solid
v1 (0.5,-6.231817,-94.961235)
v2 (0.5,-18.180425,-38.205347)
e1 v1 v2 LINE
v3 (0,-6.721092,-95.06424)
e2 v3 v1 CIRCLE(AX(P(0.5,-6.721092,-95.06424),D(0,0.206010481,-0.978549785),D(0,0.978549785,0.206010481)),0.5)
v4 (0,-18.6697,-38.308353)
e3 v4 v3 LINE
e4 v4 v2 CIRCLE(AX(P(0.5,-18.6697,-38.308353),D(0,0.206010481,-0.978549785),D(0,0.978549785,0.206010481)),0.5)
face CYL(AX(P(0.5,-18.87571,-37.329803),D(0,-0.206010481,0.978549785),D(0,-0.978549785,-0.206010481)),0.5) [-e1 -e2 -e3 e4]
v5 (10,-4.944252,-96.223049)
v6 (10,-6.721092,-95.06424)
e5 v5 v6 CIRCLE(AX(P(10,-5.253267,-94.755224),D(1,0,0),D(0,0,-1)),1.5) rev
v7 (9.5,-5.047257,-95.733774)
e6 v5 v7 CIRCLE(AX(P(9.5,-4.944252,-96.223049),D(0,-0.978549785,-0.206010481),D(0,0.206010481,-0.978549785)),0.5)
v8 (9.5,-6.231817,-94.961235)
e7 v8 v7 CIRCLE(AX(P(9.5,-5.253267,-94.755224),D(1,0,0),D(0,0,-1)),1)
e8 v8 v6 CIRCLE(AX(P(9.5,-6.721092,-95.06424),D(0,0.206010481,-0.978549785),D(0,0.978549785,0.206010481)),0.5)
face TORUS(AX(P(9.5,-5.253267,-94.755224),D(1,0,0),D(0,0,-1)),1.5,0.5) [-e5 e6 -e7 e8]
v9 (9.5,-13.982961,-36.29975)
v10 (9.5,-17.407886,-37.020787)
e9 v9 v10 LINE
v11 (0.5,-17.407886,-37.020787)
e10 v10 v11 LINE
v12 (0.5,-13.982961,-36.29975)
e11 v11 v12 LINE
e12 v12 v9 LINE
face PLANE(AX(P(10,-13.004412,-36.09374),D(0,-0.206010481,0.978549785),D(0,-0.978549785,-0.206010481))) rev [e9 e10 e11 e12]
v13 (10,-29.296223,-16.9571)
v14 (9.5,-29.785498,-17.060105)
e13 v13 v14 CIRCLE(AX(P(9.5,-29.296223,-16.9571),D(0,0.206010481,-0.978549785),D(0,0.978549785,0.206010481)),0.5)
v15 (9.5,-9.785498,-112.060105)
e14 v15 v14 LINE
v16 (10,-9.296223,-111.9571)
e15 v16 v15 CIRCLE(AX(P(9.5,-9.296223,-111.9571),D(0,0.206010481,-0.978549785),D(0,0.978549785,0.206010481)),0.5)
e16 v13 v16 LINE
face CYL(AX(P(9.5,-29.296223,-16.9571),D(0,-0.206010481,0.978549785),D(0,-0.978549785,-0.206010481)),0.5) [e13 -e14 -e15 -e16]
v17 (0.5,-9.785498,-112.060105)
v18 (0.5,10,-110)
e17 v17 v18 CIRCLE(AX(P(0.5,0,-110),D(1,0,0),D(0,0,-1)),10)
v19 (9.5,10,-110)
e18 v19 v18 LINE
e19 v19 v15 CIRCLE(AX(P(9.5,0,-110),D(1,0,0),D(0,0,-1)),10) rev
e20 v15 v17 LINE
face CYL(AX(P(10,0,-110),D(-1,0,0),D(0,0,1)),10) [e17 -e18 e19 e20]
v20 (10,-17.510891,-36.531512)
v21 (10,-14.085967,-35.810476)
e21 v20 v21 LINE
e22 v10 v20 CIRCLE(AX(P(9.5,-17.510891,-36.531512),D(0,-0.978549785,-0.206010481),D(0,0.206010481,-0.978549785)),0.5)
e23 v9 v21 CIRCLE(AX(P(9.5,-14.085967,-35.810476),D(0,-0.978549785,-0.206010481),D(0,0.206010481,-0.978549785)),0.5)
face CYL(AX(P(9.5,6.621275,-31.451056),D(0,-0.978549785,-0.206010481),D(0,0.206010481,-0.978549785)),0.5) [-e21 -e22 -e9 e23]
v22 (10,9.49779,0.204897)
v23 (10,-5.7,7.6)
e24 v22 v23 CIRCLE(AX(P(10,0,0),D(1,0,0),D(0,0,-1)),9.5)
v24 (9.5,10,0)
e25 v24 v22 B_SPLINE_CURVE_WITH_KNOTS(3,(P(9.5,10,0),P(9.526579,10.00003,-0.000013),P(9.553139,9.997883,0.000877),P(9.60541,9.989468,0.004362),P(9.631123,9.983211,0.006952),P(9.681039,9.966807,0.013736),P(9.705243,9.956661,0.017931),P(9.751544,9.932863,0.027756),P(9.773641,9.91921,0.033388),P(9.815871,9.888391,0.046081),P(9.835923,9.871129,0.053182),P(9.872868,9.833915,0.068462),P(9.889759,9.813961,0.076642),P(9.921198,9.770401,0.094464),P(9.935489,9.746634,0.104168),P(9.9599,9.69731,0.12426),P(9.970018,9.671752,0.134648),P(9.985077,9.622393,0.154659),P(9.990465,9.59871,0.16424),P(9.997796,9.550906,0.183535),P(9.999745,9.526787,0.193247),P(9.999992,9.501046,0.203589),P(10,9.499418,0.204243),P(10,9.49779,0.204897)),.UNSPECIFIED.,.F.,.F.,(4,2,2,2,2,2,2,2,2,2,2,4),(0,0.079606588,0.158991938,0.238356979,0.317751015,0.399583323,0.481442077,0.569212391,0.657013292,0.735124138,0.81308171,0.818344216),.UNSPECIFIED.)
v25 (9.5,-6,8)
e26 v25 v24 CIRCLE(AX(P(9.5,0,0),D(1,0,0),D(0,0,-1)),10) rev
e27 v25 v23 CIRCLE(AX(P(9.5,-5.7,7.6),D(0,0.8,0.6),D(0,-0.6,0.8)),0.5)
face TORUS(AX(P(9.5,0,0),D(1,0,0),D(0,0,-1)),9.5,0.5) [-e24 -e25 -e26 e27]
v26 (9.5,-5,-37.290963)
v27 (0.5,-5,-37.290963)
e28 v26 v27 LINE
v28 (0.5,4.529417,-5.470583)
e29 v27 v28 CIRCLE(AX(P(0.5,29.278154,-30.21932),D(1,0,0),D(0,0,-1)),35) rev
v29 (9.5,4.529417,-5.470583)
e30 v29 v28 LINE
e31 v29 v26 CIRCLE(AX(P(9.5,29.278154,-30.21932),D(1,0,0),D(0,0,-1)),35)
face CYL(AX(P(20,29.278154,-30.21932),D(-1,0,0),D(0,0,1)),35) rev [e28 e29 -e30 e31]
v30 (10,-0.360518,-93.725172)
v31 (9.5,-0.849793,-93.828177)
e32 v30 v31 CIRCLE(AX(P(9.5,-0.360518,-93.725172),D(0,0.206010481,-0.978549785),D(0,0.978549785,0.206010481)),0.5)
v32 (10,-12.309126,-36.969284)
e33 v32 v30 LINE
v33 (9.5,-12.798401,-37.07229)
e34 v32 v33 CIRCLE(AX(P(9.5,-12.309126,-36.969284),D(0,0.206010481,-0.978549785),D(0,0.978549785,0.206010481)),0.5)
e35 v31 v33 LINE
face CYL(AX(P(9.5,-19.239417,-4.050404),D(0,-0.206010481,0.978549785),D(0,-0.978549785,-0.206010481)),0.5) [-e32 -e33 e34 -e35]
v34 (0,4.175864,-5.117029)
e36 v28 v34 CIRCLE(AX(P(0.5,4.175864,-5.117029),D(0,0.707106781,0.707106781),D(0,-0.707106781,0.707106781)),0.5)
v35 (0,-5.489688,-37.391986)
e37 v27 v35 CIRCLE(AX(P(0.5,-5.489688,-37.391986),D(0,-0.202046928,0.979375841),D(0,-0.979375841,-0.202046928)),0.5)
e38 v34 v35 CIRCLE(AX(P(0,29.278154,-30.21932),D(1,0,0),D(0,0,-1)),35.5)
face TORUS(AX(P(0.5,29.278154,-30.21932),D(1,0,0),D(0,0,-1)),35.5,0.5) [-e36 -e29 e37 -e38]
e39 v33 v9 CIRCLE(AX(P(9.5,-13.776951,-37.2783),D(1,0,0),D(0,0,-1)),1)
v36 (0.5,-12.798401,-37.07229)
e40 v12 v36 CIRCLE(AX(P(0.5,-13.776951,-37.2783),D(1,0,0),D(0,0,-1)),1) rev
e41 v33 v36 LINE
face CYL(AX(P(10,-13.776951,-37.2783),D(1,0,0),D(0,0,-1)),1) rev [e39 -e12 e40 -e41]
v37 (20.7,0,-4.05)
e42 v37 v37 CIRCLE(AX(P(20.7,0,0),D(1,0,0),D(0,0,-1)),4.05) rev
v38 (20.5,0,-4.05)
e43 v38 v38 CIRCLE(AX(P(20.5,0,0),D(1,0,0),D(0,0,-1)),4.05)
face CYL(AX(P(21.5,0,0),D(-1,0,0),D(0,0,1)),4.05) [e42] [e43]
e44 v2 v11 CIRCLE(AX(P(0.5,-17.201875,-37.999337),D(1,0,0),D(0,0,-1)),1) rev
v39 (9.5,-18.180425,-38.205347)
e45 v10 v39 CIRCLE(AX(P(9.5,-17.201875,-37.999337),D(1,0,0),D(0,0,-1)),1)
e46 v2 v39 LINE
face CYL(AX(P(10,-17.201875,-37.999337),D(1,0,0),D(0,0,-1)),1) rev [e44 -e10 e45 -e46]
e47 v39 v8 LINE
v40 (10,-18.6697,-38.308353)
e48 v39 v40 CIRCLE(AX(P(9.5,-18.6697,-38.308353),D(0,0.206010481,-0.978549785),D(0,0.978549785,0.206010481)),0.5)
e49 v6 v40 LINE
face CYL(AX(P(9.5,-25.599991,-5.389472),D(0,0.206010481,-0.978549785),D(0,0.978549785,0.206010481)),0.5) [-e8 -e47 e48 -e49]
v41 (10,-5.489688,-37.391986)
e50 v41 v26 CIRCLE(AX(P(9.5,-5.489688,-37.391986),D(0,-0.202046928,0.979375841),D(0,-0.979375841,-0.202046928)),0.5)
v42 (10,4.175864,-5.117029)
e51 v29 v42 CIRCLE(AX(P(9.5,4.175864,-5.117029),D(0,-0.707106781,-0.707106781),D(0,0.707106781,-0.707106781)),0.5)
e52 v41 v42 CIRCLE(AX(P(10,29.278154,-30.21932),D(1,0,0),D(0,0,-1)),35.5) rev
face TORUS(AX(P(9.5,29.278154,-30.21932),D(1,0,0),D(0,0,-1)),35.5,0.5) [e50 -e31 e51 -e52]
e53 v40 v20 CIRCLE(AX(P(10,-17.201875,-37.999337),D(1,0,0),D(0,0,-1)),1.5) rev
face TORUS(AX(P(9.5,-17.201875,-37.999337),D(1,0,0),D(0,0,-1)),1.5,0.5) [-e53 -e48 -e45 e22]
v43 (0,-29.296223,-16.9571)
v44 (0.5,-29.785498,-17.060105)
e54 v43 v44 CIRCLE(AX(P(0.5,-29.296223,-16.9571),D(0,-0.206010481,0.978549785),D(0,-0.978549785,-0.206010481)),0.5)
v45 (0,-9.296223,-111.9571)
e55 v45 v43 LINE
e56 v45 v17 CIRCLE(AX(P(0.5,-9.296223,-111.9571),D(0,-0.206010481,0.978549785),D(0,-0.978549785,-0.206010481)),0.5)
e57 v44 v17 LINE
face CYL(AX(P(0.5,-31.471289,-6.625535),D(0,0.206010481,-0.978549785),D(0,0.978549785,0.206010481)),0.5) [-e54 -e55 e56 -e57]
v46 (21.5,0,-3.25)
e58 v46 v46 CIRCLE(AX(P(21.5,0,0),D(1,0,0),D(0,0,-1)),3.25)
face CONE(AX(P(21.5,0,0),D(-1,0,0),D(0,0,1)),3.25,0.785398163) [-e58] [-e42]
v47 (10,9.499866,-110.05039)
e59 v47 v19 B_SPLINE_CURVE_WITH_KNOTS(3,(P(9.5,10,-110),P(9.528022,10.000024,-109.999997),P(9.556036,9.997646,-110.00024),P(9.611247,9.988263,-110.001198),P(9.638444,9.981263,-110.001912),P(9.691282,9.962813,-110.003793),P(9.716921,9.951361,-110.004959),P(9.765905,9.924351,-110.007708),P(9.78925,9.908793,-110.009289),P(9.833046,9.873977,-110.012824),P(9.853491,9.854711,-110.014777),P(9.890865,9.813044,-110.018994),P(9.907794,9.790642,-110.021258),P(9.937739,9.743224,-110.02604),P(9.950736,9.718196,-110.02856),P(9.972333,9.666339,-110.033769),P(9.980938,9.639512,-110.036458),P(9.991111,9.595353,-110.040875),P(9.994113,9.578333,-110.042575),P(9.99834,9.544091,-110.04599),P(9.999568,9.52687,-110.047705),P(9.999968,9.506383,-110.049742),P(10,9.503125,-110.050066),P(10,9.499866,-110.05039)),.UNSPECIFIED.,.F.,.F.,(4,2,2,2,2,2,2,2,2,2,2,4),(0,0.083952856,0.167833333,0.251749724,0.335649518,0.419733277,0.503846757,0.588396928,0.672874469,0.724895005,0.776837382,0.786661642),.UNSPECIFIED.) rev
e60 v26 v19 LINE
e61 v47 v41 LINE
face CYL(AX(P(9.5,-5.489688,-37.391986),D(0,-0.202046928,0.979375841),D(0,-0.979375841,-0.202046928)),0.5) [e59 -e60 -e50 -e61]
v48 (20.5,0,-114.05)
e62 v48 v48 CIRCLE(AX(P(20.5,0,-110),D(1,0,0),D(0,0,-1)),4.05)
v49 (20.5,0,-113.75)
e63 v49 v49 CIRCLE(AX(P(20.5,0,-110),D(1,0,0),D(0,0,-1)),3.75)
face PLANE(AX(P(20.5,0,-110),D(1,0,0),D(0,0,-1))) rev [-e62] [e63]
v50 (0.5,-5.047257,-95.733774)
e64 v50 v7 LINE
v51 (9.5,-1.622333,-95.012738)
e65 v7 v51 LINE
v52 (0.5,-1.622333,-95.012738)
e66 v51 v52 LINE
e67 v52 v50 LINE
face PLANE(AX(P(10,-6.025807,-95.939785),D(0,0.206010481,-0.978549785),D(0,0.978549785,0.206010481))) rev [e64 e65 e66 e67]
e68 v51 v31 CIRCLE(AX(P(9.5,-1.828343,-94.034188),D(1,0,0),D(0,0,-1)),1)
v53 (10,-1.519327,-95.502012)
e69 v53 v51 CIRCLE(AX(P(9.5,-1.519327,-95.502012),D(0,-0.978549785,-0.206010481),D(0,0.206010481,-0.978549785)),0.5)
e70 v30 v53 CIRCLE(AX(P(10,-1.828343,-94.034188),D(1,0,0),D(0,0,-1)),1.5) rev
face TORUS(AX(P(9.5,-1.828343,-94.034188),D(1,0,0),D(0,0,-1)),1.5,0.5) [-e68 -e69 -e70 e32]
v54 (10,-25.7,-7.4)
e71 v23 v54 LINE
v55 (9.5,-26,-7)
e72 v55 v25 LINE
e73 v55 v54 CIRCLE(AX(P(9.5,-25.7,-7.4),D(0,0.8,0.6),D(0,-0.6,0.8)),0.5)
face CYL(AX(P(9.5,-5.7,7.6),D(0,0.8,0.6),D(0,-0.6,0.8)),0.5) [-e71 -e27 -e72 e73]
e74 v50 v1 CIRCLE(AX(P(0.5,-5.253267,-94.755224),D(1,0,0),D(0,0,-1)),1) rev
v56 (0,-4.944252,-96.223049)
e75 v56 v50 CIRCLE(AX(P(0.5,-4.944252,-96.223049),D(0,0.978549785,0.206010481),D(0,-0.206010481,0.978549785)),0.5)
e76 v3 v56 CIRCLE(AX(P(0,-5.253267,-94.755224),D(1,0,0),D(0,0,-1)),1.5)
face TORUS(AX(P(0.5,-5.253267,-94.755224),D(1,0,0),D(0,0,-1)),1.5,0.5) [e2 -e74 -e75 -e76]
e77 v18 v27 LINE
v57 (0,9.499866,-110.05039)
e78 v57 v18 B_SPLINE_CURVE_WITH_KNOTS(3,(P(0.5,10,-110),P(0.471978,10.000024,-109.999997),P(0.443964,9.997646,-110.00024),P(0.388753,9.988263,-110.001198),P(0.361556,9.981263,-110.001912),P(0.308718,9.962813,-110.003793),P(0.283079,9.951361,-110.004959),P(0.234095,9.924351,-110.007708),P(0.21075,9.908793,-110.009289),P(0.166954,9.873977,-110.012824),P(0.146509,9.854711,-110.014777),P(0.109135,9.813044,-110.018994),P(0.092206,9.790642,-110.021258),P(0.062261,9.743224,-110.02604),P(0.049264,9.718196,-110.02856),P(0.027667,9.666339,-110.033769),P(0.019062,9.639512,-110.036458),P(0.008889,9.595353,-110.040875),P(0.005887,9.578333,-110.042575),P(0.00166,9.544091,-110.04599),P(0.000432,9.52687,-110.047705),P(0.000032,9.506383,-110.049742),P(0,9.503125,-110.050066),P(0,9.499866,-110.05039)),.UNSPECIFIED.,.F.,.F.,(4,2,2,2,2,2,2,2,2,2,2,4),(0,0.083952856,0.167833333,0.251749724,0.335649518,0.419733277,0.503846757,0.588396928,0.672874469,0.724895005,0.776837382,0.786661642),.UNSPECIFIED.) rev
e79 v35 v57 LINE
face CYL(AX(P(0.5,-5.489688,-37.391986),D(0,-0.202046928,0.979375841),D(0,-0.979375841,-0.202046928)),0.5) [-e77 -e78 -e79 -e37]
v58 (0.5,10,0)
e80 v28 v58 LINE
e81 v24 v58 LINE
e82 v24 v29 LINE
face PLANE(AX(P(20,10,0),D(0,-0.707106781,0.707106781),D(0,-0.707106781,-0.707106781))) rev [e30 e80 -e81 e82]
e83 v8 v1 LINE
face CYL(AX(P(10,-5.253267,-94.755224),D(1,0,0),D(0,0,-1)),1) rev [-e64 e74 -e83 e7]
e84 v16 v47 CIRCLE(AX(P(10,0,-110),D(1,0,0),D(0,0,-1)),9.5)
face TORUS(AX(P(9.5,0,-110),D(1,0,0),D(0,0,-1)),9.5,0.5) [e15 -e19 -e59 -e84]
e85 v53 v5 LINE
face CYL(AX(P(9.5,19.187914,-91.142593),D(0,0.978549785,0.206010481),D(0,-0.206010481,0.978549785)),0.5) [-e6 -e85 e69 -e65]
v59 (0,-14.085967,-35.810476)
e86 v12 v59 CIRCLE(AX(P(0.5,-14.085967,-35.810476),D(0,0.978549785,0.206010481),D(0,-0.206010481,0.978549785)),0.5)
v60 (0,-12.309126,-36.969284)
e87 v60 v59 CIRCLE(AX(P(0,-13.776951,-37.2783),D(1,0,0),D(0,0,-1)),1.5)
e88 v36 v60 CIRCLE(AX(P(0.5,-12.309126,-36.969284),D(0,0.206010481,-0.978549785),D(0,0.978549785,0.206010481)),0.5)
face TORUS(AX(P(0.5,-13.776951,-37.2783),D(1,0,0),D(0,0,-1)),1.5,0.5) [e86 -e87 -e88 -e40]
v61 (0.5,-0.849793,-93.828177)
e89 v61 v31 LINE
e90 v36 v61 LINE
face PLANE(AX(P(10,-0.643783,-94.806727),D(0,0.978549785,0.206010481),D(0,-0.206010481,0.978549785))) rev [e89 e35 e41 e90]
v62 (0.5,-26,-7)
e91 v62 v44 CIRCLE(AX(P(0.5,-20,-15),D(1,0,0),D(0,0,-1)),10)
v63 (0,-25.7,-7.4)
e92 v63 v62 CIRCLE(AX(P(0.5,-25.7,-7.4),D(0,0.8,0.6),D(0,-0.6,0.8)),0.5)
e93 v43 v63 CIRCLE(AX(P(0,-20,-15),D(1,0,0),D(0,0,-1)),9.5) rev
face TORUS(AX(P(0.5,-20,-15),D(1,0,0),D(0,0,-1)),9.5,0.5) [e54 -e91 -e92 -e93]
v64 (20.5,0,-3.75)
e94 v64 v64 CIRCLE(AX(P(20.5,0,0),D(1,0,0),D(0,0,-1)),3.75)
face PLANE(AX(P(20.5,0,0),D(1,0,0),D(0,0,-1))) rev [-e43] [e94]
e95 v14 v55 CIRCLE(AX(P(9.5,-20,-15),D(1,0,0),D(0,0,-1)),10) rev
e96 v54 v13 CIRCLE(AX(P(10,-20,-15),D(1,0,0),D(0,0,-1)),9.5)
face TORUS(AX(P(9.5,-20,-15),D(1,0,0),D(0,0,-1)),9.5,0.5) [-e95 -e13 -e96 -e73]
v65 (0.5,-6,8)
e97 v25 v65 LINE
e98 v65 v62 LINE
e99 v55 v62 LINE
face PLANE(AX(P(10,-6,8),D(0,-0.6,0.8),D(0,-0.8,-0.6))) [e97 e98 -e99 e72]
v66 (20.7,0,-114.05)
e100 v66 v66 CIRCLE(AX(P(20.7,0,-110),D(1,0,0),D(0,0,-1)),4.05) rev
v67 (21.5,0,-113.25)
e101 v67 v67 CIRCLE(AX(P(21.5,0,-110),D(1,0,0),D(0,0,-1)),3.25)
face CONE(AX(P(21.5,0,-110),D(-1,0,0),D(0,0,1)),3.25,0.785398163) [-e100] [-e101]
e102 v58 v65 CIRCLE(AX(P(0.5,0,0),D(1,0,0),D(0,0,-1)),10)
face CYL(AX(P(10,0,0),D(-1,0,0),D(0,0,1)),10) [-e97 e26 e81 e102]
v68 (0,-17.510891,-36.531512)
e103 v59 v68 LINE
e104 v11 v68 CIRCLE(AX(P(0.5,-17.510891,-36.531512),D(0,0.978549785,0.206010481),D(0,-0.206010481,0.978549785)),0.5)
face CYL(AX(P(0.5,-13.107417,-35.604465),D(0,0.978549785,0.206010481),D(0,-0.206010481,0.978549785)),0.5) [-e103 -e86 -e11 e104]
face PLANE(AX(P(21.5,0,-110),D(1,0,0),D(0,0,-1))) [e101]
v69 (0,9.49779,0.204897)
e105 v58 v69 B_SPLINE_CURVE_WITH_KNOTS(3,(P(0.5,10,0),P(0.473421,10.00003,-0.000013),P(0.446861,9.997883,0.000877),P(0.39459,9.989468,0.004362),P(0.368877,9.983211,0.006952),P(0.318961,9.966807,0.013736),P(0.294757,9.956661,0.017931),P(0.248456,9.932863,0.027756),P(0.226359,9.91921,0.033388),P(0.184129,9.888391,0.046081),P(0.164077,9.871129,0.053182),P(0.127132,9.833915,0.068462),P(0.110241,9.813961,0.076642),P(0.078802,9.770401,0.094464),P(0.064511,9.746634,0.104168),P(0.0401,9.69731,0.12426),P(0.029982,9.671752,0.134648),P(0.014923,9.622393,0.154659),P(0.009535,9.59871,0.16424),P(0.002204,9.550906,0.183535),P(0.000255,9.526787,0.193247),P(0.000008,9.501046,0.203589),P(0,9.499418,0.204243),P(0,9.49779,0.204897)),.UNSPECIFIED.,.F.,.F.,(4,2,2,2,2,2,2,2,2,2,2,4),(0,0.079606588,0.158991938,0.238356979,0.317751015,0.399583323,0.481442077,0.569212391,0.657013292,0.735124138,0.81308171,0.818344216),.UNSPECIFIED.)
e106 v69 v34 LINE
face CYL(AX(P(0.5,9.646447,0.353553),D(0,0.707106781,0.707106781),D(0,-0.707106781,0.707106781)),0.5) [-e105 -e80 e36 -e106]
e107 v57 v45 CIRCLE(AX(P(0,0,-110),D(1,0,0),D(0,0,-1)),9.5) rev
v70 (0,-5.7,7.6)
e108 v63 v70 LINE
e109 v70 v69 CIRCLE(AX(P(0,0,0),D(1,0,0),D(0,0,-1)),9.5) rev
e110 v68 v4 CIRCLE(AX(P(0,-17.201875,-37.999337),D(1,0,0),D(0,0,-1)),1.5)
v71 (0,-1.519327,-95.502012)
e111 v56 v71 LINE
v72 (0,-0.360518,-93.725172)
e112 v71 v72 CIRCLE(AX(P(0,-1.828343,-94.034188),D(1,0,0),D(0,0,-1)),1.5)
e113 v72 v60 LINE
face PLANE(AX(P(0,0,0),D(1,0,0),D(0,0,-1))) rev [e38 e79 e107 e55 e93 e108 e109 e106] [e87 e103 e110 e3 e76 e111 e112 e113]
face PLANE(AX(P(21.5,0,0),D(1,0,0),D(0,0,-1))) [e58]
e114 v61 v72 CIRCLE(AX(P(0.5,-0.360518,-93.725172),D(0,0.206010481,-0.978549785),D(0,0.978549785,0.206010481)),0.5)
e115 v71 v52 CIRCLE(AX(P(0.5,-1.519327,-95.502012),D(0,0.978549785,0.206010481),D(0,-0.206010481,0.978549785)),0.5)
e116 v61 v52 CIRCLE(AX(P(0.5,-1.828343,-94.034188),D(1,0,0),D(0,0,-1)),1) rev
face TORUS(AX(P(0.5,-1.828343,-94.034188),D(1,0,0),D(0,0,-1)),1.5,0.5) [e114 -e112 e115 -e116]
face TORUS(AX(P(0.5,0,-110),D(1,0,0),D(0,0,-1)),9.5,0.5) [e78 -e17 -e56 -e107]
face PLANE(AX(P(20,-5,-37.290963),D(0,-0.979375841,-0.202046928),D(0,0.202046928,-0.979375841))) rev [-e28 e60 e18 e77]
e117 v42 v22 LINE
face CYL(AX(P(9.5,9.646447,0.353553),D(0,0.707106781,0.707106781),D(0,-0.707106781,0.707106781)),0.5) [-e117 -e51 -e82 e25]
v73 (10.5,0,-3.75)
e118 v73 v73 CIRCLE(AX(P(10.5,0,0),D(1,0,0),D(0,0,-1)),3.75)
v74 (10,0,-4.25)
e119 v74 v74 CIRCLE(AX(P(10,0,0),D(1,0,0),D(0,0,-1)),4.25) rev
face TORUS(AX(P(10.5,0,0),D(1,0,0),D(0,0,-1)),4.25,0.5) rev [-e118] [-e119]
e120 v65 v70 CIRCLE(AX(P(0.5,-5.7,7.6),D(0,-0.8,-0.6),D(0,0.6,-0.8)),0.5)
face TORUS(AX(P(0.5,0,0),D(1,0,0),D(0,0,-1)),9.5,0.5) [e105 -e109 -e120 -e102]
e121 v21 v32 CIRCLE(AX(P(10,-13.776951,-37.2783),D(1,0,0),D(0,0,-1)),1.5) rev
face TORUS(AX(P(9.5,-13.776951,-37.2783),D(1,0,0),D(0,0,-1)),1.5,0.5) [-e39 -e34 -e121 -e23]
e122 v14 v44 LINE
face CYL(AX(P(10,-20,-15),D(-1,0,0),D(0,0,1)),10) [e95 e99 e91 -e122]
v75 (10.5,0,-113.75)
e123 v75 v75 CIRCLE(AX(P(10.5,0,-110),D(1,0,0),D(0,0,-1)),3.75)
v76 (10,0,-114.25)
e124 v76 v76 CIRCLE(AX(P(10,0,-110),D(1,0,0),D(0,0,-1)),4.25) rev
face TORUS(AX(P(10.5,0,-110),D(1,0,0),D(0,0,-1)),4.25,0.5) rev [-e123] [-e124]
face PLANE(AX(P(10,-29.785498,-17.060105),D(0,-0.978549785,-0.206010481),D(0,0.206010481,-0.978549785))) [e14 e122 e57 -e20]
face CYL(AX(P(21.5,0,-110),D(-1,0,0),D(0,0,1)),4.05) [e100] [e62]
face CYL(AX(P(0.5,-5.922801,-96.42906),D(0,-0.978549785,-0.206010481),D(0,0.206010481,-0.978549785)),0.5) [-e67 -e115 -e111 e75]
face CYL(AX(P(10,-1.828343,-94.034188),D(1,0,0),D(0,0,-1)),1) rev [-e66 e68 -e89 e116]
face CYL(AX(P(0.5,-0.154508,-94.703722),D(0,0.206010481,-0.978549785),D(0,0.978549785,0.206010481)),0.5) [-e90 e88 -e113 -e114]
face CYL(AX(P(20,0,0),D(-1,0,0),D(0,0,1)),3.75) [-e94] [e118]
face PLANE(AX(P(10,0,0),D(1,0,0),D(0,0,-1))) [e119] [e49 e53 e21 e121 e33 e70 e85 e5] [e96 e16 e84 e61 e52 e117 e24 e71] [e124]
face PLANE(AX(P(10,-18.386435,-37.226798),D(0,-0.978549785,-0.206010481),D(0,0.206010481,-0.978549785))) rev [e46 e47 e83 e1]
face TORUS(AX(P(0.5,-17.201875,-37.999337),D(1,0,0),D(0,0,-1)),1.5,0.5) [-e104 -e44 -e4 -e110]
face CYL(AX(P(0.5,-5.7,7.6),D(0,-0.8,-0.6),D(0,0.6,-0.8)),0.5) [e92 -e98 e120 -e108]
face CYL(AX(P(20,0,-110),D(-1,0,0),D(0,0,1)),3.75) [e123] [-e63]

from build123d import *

# Parameters (mm, degrees)
SKETCH_1_R          = 3.75
EXTRUDE_1_DEPTH     = 10
SKETCH_2_R          = 3.75
SKETCH_2_R_2        = 3.750000000000006
EXTRUDE_2_DEPTH     = 10
EXTRUDE_3_DEPTH     = 10
CUT_EXTRUDE_1_DEPTH = 126.29964086141668
CUT_EXTRUDE_2_DEPTH = 10
FILLET_1_R          = 1
EXTRUDE_START       = 0.5
SKETCH_6_R          = 3.750000000000006
SKETCH_6_R_2        = 3.75
EXTRUDE_4_DEPTH     = 0.5
SKETCH_7_R          = 4.0500000000000025
EXTRUDE_5_DEPTH     = 1
CHAMFER_1_SIZE      = 0.8
SKETCH_8_R          = 4.05
EXTRUDE_6_DEPTH     = 1
CHAMFER_2_SIZE      = 0.8
FILLET_3_R          = 0.5


with BuildPart() as part:
    # 草图1 → 凸台-拉伸1 (new body)
    with BuildSketch(Plane(origin=(0, 0, 0), x_dir=(0, 0, -1), z_dir=(1, 0, 0))):
        with BuildLine():
            Line((0, 10), (110, 10))
            ThreePointArc((110, 10), (120, 0), (110, -10))
            Line((110, -10), (0, -10))
            ThreePointArc((0, -10), (-10, 1.22e-15), (0, 10))
        make_face()
        Circle(SKETCH_1_R, mode=Mode.SUBTRACT)
    extrude(amount=EXTRUDE_1_DEPTH)

    # 草图2 → 凸台-拉伸2 (add, symmetric)
    with BuildSketch(Plane(origin=(10, 0, 0), x_dir=(0, 0, -1), z_dir=(1, 0, 0))):
        Circle(SKETCH_2_R)
        with Locations((110, 0)):
            Circle(SKETCH_2_R_2)
    extrude(amount=EXTRUDE_2_DEPTH, both=True)

    # 草图3 → 凸台-拉伸3 (add)
    with BuildSketch(Plane.ZY):
        with BuildLine():
            Line((8, -6), (-6.999999999999996, -26.00000000000001))
            ThreePointArc((-6.999999999999996, -26.00000000000001), (-11.478198300811943, -29.359322239969963), (-17.06010481049842, -29.785497849867504))
            Line((-17.06010481049842, -29.785497849867504), (-112.06010481049843, -9.785497849867493))
            ThreePointArc((-112.06010481049843, -9.785497849867493), (-119.94622990129112, 1.0356209493161885), (-110, 10))
            Line((-110, 10), (6.1e-16, 10))
            ThreePointArc((6.1e-16, 10), (8.94427190999916, 4.472135954999579), (8, -6))
        make_face()
    extrude(amount=-EXTRUDE_3_DEPTH)

    # 草图4 → 切除-拉伸1 (cut, through all)
    with BuildSketch(Plane.ZY):
        with BuildLine():
            Line((6.1e-16, 10), (-5.470582889553738, 4.52941711044617))
            ThreePointArc((-5.470582889553738, 4.52941711044617), (-20.178286006408136, -4.250603826537166), (-37.29096271119614, -4.999999999999999))
            Line((-37.29096271119614, -4.999999999999999), (-110, 10))
            Line((-110, 10), (6.1e-16, 10))
        make_face()
    extrude(amount=-CUT_EXTRUDE_1_DEPTH, mode=Mode.SUBTRACT)

    # 草图5 → 切除-拉伸2 (cut)
    with BuildSketch(Plane.ZY):
        Polygon((-37.22679756914334, -18.386435433698402), (-95.9397846683483, -6.025806570707891), (-94.80672702257417, -0.6437827532807727), (-36.09373992336921, -13.00441161627128), align=None)
    extrude(amount=-CUT_EXTRUDE_2_DEPTH, mode=Mode.SUBTRACT)

    # 圆角1
    fillet_1_edges = [part.edges().sort_by_distance(p)[0] for p in [
        (5, -13.00441161627128, -36.09373992336921),
        (5, -18.386435433698402, -37.22679756914334),
        (5, -6.025806570707891, -95.9397846683483),
        (5, -0.6437827532807727, -94.80672702257417),
    ]]
    fillet(fillet_1_edges, radius=FILLET_1_R)

    # 草图6 → 凸台-拉伸4 (add)
    with BuildSketch(Plane(origin=(20, 0, 0), x_dir=(0, 0, -1), z_dir=(1, 0, 0)).offset(EXTRUDE_START)):
        with Locations((110, 0)):
            Circle(SKETCH_6_R)
        Circle(SKETCH_6_R_2)
    extrude(amount=-EXTRUDE_4_DEPTH)

    # 草图7 → 凸台-拉伸5 (add)
    with BuildSketch(Plane(origin=(20.5, 0, 0), x_dir=(0, 0, -1), z_dir=(1, 0, 0))):
        with Locations((110, 0)):
            Circle(SKETCH_7_R)
    extrude(amount=EXTRUDE_5_DEPTH)

    # 倒角1
    chamfer_1_edges = [part.edges().sort_by_distance(p)[0] for p in [
        (21.5, 5e-16, -105.95),
    ]]
    chamfer(chamfer_1_edges, length=CHAMFER_1_SIZE)

    # 草图8 → 凸台-拉伸6 (add)
    with BuildSketch(Plane(origin=(20.5, 0, 0), x_dir=(0, 0, -1), z_dir=(1, 0, 0))):
        Circle(SKETCH_8_R)
    extrude(amount=EXTRUDE_6_DEPTH)

    # 倒角2
    chamfer_2_edges = [part.edges().sort_by_distance(p)[0] for p in [
        (21.5, 5e-16, 4.05),
    ]]
    chamfer(chamfer_2_edges, length=CHAMFER_2_SIZE)

    # 圆角3
    # the kernel refuses this fillet: 0.5 mm, written as the material it adds along each edge
    with BuildSketch(Plane(origin=(10, 0, 0), x_dir=(0, 0, -1), z_dir=(0, -1, 0))) as fillet_3_piece_1:
        with BuildLine():
            CenterArc((3.75 + FILLET_3_R, FILLET_3_R), FILLET_3_R, 180, 90)
            Line((3.75 + FILLET_3_R, 0), (3.75, 0))
            Line((3.75, 0), (3.75, FILLET_3_R))
        make_face()
    revolve(axis=Axis((10, 0, 0), (1, 0, 0)))
    with BuildSketch(Plane(origin=(10, 0, -110), x_dir=(0, 0, -1), z_dir=(0, -1, 0))) as fillet_3_piece_2:
        with BuildLine():
            CenterArc((3.75 + FILLET_3_R, FILLET_3_R), FILLET_3_R, 180, 90)
            Line((3.75, FILLET_3_R), (3.75, 0))
            Line((3.75, 0), (3.75 + FILLET_3_R, 0))
        make_face()
    revolve(axis=Axis((10, 0, -110), (1, 0, 0)))
    # the kernel refuses this fillet: 0.5 mm, written as the material it takes off along each edge
    with BuildSketch(Plane(origin=(0, -1.8283430193173613, -94.03418771863726), x_dir=(0, 0.9785497849867515, 0.20601048104983025), z_dir=(0, -0.20601048104983025, 0.9785497849867515))) as fillet_3_2_piece_1:
        with BuildLine():
            CenterArc((1 + FILLET_3_R, -FILLET_3_R), FILLET_3_R, 90.00000000000007, 89.99999999999994)
            Line((1 + FILLET_3_R, 6e-17), (1, 0))
            Line((1, 0), (0.9999999999999994, -FILLET_3_R))
        make_face()
    revolve(axis=Axis((0, -1.8283430193173613, -94.03418771863726), (-1, 0, 0)), revolution_arc=89.99999999999942, mode=Mode.SUBTRACT)
    with BuildSketch(Plane(origin=(10, -1.8283430193173613, -94.03418771863726), x_dir=(0, 0.9785497849867515, 0.20601048104983025), z_dir=(0, -0.20601048104983025, 0.9785497849867515))) as fillet_3_2_piece_2:
        with BuildLine():
            CenterArc((1 + FILLET_3_R, FILLET_3_R), FILLET_3_R, 180, 90)
            Line((0.9999999999999988, FILLET_3_R), (1, 0))
            Line((1, 0), (1 + FILLET_3_R, 0))
        make_face()
    revolve(axis=Axis((10, -1.8283430193173613, -94.03418771863726), (-1, 0, 0)), revolution_arc=89.99999999999942, mode=Mode.SUBTRACT)
    with BuildSketch(Plane(origin=(0, -8.9e-16, -110), x_dir=(0, 0.992175793893205, 0.12484868446398849), z_dir=(0, -0.12484868446398849, 0.992175793893205))) as fillet_3_2_piece_3:
        with BuildLine():
            CenterArc((9.999999999999998 - FILLET_3_R, -FILLET_3_R), FILLET_3_R, 0, 90)
            Line((9.999999999999998 - FILLET_3_R, 6e-17), (9.999999999999998, 0))
            Line((9.999999999999998, 0), (10.000000000000002, -FILLET_3_R))
        make_face()
    revolve(axis=Axis((0, -8.9e-16, -110), (-1, 0, 0)), revolution_arc=175.28335954758495, mode=Mode.SUBTRACT)
    with BuildSketch(Plane(origin=(10, -8.9e-16, -110), x_dir=(0, 0.992175793893205, 0.12484868446398853), z_dir=(0, -0.12484868446398853, 0.992175793893205))) as fillet_3_2_piece_4:
        with BuildLine():
            CenterArc((10.000000000000002 - FILLET_3_R, FILLET_3_R), FILLET_3_R, 270, 90)
            Line((10.000000000000002, FILLET_3_R), (10.000000000000002, 0))
            Line((10.000000000000002, 0), (10.000000000000002 - FILLET_3_R, 0))
        make_face()
    revolve(axis=Axis((10, -8.9e-16, -110), (-1, 0, 0)), revolution_arc=175.28335954758495, mode=Mode.SUBTRACT)
    with BuildSketch(Plane(origin=(0, -29.785497849867504, -17.06010481049842), x_dir=(1, 0, 0), z_dir=(0, 0.206010481049842, -0.978549784986749))) as fillet_3_2_piece_5:
        with BuildLine():
            CenterArc((FILLET_3_R, -FILLET_3_R), FILLET_3_R, 90, 89.99999999999991)
            Line((-6e-17, -FILLET_3_R), (0, 0))
            Line((0, 0), (FILLET_3_R, 0))
        make_face()
    extrude(amount=97.08243919473801, mode=Mode.SUBTRACT)
    with BuildSketch(Plane(origin=(0, -19.999999999999993, -15.000000000000004), x_dir=(0, -0.600000000000001, 0.7999999999999994), z_dir=(0, 0.7999999999999994, 0.600000000000001))) as fillet_3_2_piece_6:
        with BuildLine():
            CenterArc((10.000000000000021 - FILLET_3_R, FILLET_3_R), FILLET_3_R, 270.0000000000004, 89.9999999999996)
            Line((10.000000000000021 - FILLET_3_R, -6e-17), (10.000000000000021, 0))
            Line((10.000000000000021, 0), (10.00000000000002, FILLET_3_R))
        make_face()
    revolve(axis=Axis((0, -19.999999999999993, -15.000000000000004), (1, 0, 0)), revolution_arc=65.01876039378385, mode=Mode.SUBTRACT)
    with BuildSketch(Plane(origin=(0, -6, 8), x_dir=(1, 0, 0), z_dir=(0, -0.8000000000000003, -0.5999999999999998))) as fillet_3_2_piece_7:
        with BuildLine():
            CenterArc((FILLET_3_R, -FILLET_3_R), FILLET_3_R, 90, 89.99999999999986)
            Line((-6e-17, -FILLET_3_R), (0, 0))
            Line((0, 0), (FILLET_3_R, 0))
        make_face()
    extrude(amount=25.000000000000007, mode=Mode.SUBTRACT)
    with BuildSketch(Plane(origin=(10, -6, 8), x_dir=(0, 0.5999999999999998, -0.8000000000000003), z_dir=(0, -0.8000000000000003, -0.5999999999999998))) as fillet_3_2_piece_8:
        with BuildLine():
            CenterArc((FILLET_3_R, -FILLET_3_R), FILLET_3_R, 90, 90)
            Line((-1.95e-15, -FILLET_3_R), (0, 0))
            Line((0, 0), (FILLET_3_R, 0))
        make_face()
    extrude(amount=25.000000000000007, mode=Mode.SUBTRACT)
    with BuildSketch(Plane(origin=(10, -19.999999999999993, -15.000000000000004), x_dir=(0, -0.600000000000001, 0.7999999999999994), z_dir=(0, 0.7999999999999994, 0.600000000000001))) as fillet_3_2_piece_9:
        with BuildLine():
            CenterArc((10.000000000000021 - FILLET_3_R, -FILLET_3_R), FILLET_3_R, 0, 90)
            Line((10.000000000000023, -FILLET_3_R), (10.000000000000021, 0))
            Line((10.000000000000021, 0), (10.000000000000021 - FILLET_3_R, 0))
        make_face()
    revolve(axis=Axis((10, -19.999999999999993, -15.000000000000004), (1, 0, 0)), revolution_arc=65.01876039378385, mode=Mode.SUBTRACT)
    with BuildSketch(Plane(origin=(10, -29.785497849867504, -17.06010481049842), x_dir=(0, 0.9785497849867489, 0.20601048104984196), z_dir=(0, 0.206010481049842, -0.978549784986749))) as fillet_3_2_piece_10:
        with BuildLine():
            CenterArc((FILLET_3_R, -FILLET_3_R), FILLET_3_R, 90, 90)
            Line((0, -FILLET_3_R), (0, 0))
            Line((0, 0), (FILLET_3_R, 0))
        make_face()
    extrude(amount=97.08243919473801, mode=Mode.SUBTRACT)
    with BuildSketch(Plane(origin=(10, 0, 0), x_dir=(0, -0.5999999999999998, 0.8000000000000002), z_dir=(0, -0.8000000000000002, -0.5999999999999998))) as fillet_3_2_piece_11:
        with BuildLine():
            CenterArc((10 - FILLET_3_R, FILLET_3_R), FILLET_3_R, 270, 90)
            Line((10, FILLET_3_R), (10, 0))
            Line((10, 0), (10 - FILLET_3_R, 0))
        make_face()
    revolve(axis=Axis((10, 0, 0), (-1, 0, 0)), revolution_arc=134.0375887678595, mode=Mode.SUBTRACT)
    with BuildSketch(Plane(origin=(10, 29.27815445197507, -30.219320231083113), x_dir=(0, -0.979375841485003, -0.2020469280032294), z_dir=(0, 0.2020469280032294, -0.979375841485003))) as fillet_3_2_piece_12:
        with BuildLine():
            CenterArc((34.99999999999997 + FILLET_3_R, FILLET_3_R), FILLET_3_R, 180, 90)
            Line((34.99999999999997, FILLET_3_R), (34.99999999999997, 0))
            Line((34.99999999999997, 0), (34.99999999999997 + FILLET_3_R, 0))
        make_face()
    revolve(axis=Axis((10, 29.27815445197507, -30.219320231083113), (-1, 0, 0)), revolution_arc=56.65668339446086, mode=Mode.SUBTRACT)
    with BuildSketch(Plane(origin=(10, 10.883883476483195, 0.8838834764831773), x_dir=(0, -0.7071067811865417, 0.7071067811865535), z_dir=(0, -0.7071067811865535, -0.7071067811865416))) as fillet_3_2_piece_13:
        with BuildLine():
            CenterArc((FILLET_3_R, FILLET_3_R), FILLET_3_R, 180, 90)
            Line((-1.6e-16, FILLET_3_R), (0, 0))
            Line((0, 0), (FILLET_3_R, 0))
        make_face()
    extrude(amount=8.986572516493158, mode=Mode.SUBTRACT)
    with BuildSketch(Plane(origin=(10, -5, -37.29096271119614), x_dir=(0, -0.9793758414850032, -0.20204692800322901), z_dir=(0, 0.20204692800322901, -0.9793758414850032))) as fillet_3_2_piece_14:
        with BuildLine():
            CenterArc((FILLET_3_R, FILLET_3_R), FILLET_3_R, 180, 90)
            Line((0, FILLET_3_R), (0, 0))
            Line((0, 0), (FILLET_3_R, 0))
        make_face()
    extrude(amount=75.49017849833521, mode=Mode.SUBTRACT)
    with BuildSketch(Plane(origin=(0, -4.999999999999999, -37.29096271119614), x_dir=(1, 0, 0), z_dir=(0, 0.202046928003229, -0.9793758414850031))) as fillet_3_2_piece_15:
        with BuildLine():
            CenterArc((FILLET_3_R, FILLET_3_R), FILLET_3_R, 180, 90)
            Line((-6e-17, FILLET_3_R), (0, 0))
            Line((0, 0), (FILLET_3_R, 0))
        make_face()
    extrude(amount=75.49017849833521, mode=Mode.SUBTRACT)
    with BuildSketch(Plane(origin=(0, 29.27815445197507, -30.219320231083113), x_dir=(0, -0.7071067811865408, 0.7071067811865543), z_dir=(0, 0.7071067811865543, 0.7071067811865408))) as fillet_3_2_piece_16:
        with BuildLine():
            CenterArc((34.99999999999997 + FILLET_3_R, FILLET_3_R), FILLET_3_R, 180, 90)
            Line((34.99999999999997 + FILLET_3_R, -6e-17), (34.99999999999997, 0))
            Line((34.99999999999997, 0), (34.99999999999997, FILLET_3_R))
        make_face()
    revolve(axis=Axis((0, 29.27815445197507, -30.219320231083113), (1, 0, 0)), revolution_arc=56.65668339446088, mode=Mode.SUBTRACT)
    with BuildSketch(Plane(origin=(0, 10.883883476483192, 0.8838834764831777), x_dir=(1, -2.2e-16, 2.2e-16), z_dir=(0, -0.7071067811865535, -0.7071067811865416))) as fillet_3_2_piece_17:
        with BuildLine():
            CenterArc((FILLET_3_R, FILLET_3_R), FILLET_3_R, 180.00000000000003, 89.99999999999994)
            Line((1e-16, FILLET_3_R), (0, 0))
            Line((0, 0), (FILLET_3_R, 0))
        make_face()
    extrude(amount=8.986572516493156, mode=Mode.SUBTRACT)
    with BuildSketch(Plane(origin=(0, 0, 0), x_dir=(0, -0.5999999999999998, 0.8000000000000002), z_dir=(0, -0.8000000000000002, -0.5999999999999998))) as fillet_3_2_piece_18:
        with BuildLine():
            CenterArc((10 - FILLET_3_R, -FILLET_3_R), FILLET_3_R, 0, 90)
            Line((10 - FILLET_3_R, 6e-17), (10, 0))
            Line((10, 0), (10, -FILLET_3_R))
        make_face()
    revolve(axis=Axis((0, 0, 0), (-1, 0, 0)), revolution_arc=134.0375887678595, mode=Mode.SUBTRACT)
    with BuildSketch(Plane(origin=(0, -0.8497932343306142, -93.82817723758741), x_dir=(1, -2.1e-16, -4e-17), z_dir=(0, -0.20601048104984176, 0.978549784986749))) as fillet_3_2_piece_19:
        with BuildLine():
            CenterArc((FILLET_3_R, FILLET_3_R), FILLET_3_R, 180, 90)
            Line((-1.6e-16, FILLET_3_R), (0, 0))
            Line((0, 0), (FILLET_3_R, 0))
        make_face()
    extrude(amount=58.00000000000001, mode=Mode.SUBTRACT)
    with BuildSketch(Plane(origin=(10, -0.8497932343306142, -93.82817723758741), x_dir=(0, 0.978549784986749, 0.20601048104984176), z_dir=(0, -0.20601048104984176, 0.978549784986749))) as fillet_3_2_piece_20:
        with BuildLine():
            CenterArc((FILLET_3_R, FILLET_3_R), FILLET_3_R, 180, 90)
            Line((2.2e-16, FILLET_3_R), (0, 0))
            Line((0, 0), (FILLET_3_R, 0))
        make_face()
    extrude(amount=58.00000000000001, mode=Mode.SUBTRACT)
    with BuildSketch(Plane(origin=(0, -13.98296140125803, -36.29975040441906), x_dir=(1, 1.5e-16, -7.2e-16), z_dir=(0, -0.978549784986749, -0.20601048104984176))) as fillet_3_2_piece_21:
        with BuildLine():
            CenterArc((FILLET_3_R, FILLET_3_R), FILLET_3_R, 180, 90.00000000000006)
            Line((-4.2e-16, FILLET_3_R), (0, 0))
            Line((0, 0), (FILLET_3_R, 0))
        make_face()
    extrude(amount=3.4999999999999982, mode=Mode.SUBTRACT)
    with BuildSketch(Plane(origin=(10, -13.98296140125803, -36.29975040441906), x_dir=(0, -0.20601048104984174, 0.978549784986749), z_dir=(0, -0.978549784986749, -0.20601048104984176))) as fillet_3_2_piece_22:
        with BuildLine():
            CenterArc((FILLET_3_R, FILLET_3_R), FILLET_3_R, 180, 90)
            Line((-3.7e-16, FILLET_3_R), (0, 0))
            Line((0, 0), (FILLET_3_R, 0))
        make_face()
    extrude(amount=3.4999999999999982, mode=Mode.SUBTRACT)
    with BuildSketch(Plane(origin=(0, -18.180424952648558, -38.2053473541301), x_dir=(1, 0, 0), z_dir=(0, 0.20601048104984182, -0.978549784986749))) as fillet_3_2_piece_23:
        with BuildLine():
            CenterArc((FILLET_3_R, FILLET_3_R), FILLET_3_R, 180, 90)
            Line((-6e-17, FILLET_3_R), (0, 0))
            Line((0, 0), (FILLET_3_R, 0))
        make_face()
    extrude(amount=58.000000000000014, mode=Mode.SUBTRACT)
    with BuildSketch(Plane(origin=(10, -18.180424952648558, -38.2053473541301), x_dir=(0, -0.978549784986749, -0.20601048104984182), z_dir=(0, 0.20601048104984182, -0.978549784986749))) as fillet_3_2_piece_24:
        with BuildLine():
            CenterArc((FILLET_3_R, FILLET_3_R), FILLET_3_R, 180, 90)
            Line((0, FILLET_3_R), (0, 0))
            Line((0, 0), (FILLET_3_R, 0))
        make_face()
    extrude(amount=58.000000000000014, mode=Mode.SUBTRACT)
    with BuildSketch(Plane(origin=(0, -5.047256785721146, -95.73377418729845), x_dir=(1, 0, 0), z_dir=(0, 0.978549784986749, 0.2060104810498419))) as fillet_3_2_piece_25:
        with BuildLine():
            CenterArc((FILLET_3_R, FILLET_3_R), FILLET_3_R, 180, 90)
            Line((-6e-17, FILLET_3_R), (0, 0))
            Line((0, 0), (FILLET_3_R, 0))
        make_face()
    extrude(amount=3.5000000000000036, mode=Mode.SUBTRACT)
    with BuildSketch(Plane(origin=(10, -5.047256785721146, -95.73377418729845), x_dir=(0, 0.20601048104984193, -0.978549784986749), z_dir=(0, 0.978549784986749, 0.2060104810498419))) as fillet_3_2_piece_26:
        with BuildLine():
            CenterArc((FILLET_3_R, FILLET_3_R), FILLET_3_R, 180, 90)
            Line((0, FILLET_3_R), (0, 0))
            Line((0, 0), (FILLET_3_R, 0))
        make_face()
    extrude(amount=3.5000000000000036, mode=Mode.SUBTRACT)
    with BuildSketch(Plane(origin=(0, -13.776950920208188, -37.278300189405805), x_dir=(0, -0.20601048104984307, 0.9785497849867488), z_dir=(0, -0.9785497849867488, -0.20601048104984307))) as fillet_3_2_piece_27:
        with BuildLine():
            CenterArc((0.9999999999999981 + FILLET_3_R, -FILLET_3_R), FILLET_3_R, 90, 90)
            Line((0.9999999999999981 + FILLET_3_R, 6e-17), (0.9999999999999981, 0))
            Line((0.9999999999999981, 0), (0.9999999999999981, -FILLET_3_R))
        make_face()
    revolve(axis=Axis((0, -13.776950920208188, -37.278300189405805), (-1, 0, 0)), revolution_arc=89.9999999999999, mode=Mode.SUBTRACT)
    with BuildSketch(Plane(origin=(10, -13.776950920208188, -37.278300189405805), x_dir=(0, -0.20601048104984307, 0.9785497849867488), z_dir=(0, -0.9785497849867488, -0.20601048104984307))) as fillet_3_2_piece_28:
        with BuildLine():
            CenterArc((0.9999999999999981 + FILLET_3_R, FILLET_3_R), FILLET_3_R, 180, 90)
            Line((0.9999999999999981, FILLET_3_R), (0.9999999999999981, 0))
            Line((0.9999999999999981, 0), (0.9999999999999981 + FILLET_3_R, 0))
        make_face()
    revolve(axis=Axis((10, -13.776950920208188, -37.278300189405805), (-1, 0, 0)), revolution_arc=89.9999999999999, mode=Mode.SUBTRACT)
    with BuildSketch(Plane(origin=(0, -17.20187516766181, -37.99933687308025), x_dir=(0, -0.20601048104984135, 0.9785497849867492), z_dir=(0, 0.9785497849867492, 0.20601048104984135))) as fillet_3_2_piece_29:
        with BuildLine():
            CenterArc((0.9999999999999977 + FILLET_3_R, FILLET_3_R), FILLET_3_R, 180, 90)
            Line((0.9999999999999977 + FILLET_3_R, -6e-17), (0.9999999999999977, 0))
            Line((0.9999999999999977, 0), (0.9999999999999977, FILLET_3_R))
        make_face()
    revolve(axis=Axis((0, -17.20187516766181, -37.99933687308025), (1, 0, 0)), revolution_arc=90.00000000000028, mode=Mode.SUBTRACT)
    with BuildSketch(Plane(origin=(10, -17.20187516766181, -37.99933687308025), x_dir=(0, -0.20601048104984135, 0.9785497849867492), z_dir=(0, 0.9785497849867492, 0.20601048104984135))) as fillet_3_2_piece_30:
        with BuildLine():
            CenterArc((0.9999999999999977 + FILLET_3_R, -FILLET_3_R), FILLET_3_R, 90, 90)
            Line((0.9999999999999977, -FILLET_3_R), (0.9999999999999977, 0))
            Line((0.9999999999999977, 0), (0.9999999999999977 + FILLET_3_R, 0))
        make_face()
    revolve(axis=Axis((10, -17.20187516766181, -37.99933687308025), (1, 0, 0)), revolution_arc=90.00000000000028, mode=Mode.SUBTRACT)
    with BuildSketch(Plane(origin=(0, -5.253267266770983, -94.75522440231171), x_dir=(0, 0.20601048104984165, -0.9785497849867492), z_dir=(0, 0.9785497849867492, 0.20601048104984165))) as fillet_3_2_piece_31:
        with BuildLine():
            CenterArc((1.000000000000005 + FILLET_3_R, -FILLET_3_R), FILLET_3_R, 89.9999999999999, 90.00000000000011)
            Line((1.000000000000005 + FILLET_3_R, 6e-17), (1.000000000000005, 0))
            Line((1.000000000000005, 0), (1.000000000000004, -FILLET_3_R))
        make_face()
    revolve(axis=Axis((0, -5.253267266770983, -94.75522440231171), (-1, 0, 0)), revolution_arc=89.99999999999984, mode=Mode.SUBTRACT)
    with BuildSketch(Plane(origin=(10, -5.253267266770983, -94.75522440231171), x_dir=(0, 0.20601048104984165, -0.9785497849867492), z_dir=(0, 0.9785497849867492, 0.20601048104984165))) as fillet_3_2_piece_32:
        with BuildLine():
            CenterArc((1.000000000000005 + FILLET_3_R, FILLET_3_R), FILLET_3_R, 180, 90)
            Line((1.000000000000004, FILLET_3_R), (1.000000000000005, 0))
            Line((1.000000000000005, 0), (1.000000000000005 + FILLET_3_R, 0))
        make_face()
    revolve(axis=Axis((10, -5.253267266770983, -94.75522440231171), (-1, 0, 0)), revolution_arc=89.99999999999984, mode=Mode.SUBTRACT)


solid = part.part
